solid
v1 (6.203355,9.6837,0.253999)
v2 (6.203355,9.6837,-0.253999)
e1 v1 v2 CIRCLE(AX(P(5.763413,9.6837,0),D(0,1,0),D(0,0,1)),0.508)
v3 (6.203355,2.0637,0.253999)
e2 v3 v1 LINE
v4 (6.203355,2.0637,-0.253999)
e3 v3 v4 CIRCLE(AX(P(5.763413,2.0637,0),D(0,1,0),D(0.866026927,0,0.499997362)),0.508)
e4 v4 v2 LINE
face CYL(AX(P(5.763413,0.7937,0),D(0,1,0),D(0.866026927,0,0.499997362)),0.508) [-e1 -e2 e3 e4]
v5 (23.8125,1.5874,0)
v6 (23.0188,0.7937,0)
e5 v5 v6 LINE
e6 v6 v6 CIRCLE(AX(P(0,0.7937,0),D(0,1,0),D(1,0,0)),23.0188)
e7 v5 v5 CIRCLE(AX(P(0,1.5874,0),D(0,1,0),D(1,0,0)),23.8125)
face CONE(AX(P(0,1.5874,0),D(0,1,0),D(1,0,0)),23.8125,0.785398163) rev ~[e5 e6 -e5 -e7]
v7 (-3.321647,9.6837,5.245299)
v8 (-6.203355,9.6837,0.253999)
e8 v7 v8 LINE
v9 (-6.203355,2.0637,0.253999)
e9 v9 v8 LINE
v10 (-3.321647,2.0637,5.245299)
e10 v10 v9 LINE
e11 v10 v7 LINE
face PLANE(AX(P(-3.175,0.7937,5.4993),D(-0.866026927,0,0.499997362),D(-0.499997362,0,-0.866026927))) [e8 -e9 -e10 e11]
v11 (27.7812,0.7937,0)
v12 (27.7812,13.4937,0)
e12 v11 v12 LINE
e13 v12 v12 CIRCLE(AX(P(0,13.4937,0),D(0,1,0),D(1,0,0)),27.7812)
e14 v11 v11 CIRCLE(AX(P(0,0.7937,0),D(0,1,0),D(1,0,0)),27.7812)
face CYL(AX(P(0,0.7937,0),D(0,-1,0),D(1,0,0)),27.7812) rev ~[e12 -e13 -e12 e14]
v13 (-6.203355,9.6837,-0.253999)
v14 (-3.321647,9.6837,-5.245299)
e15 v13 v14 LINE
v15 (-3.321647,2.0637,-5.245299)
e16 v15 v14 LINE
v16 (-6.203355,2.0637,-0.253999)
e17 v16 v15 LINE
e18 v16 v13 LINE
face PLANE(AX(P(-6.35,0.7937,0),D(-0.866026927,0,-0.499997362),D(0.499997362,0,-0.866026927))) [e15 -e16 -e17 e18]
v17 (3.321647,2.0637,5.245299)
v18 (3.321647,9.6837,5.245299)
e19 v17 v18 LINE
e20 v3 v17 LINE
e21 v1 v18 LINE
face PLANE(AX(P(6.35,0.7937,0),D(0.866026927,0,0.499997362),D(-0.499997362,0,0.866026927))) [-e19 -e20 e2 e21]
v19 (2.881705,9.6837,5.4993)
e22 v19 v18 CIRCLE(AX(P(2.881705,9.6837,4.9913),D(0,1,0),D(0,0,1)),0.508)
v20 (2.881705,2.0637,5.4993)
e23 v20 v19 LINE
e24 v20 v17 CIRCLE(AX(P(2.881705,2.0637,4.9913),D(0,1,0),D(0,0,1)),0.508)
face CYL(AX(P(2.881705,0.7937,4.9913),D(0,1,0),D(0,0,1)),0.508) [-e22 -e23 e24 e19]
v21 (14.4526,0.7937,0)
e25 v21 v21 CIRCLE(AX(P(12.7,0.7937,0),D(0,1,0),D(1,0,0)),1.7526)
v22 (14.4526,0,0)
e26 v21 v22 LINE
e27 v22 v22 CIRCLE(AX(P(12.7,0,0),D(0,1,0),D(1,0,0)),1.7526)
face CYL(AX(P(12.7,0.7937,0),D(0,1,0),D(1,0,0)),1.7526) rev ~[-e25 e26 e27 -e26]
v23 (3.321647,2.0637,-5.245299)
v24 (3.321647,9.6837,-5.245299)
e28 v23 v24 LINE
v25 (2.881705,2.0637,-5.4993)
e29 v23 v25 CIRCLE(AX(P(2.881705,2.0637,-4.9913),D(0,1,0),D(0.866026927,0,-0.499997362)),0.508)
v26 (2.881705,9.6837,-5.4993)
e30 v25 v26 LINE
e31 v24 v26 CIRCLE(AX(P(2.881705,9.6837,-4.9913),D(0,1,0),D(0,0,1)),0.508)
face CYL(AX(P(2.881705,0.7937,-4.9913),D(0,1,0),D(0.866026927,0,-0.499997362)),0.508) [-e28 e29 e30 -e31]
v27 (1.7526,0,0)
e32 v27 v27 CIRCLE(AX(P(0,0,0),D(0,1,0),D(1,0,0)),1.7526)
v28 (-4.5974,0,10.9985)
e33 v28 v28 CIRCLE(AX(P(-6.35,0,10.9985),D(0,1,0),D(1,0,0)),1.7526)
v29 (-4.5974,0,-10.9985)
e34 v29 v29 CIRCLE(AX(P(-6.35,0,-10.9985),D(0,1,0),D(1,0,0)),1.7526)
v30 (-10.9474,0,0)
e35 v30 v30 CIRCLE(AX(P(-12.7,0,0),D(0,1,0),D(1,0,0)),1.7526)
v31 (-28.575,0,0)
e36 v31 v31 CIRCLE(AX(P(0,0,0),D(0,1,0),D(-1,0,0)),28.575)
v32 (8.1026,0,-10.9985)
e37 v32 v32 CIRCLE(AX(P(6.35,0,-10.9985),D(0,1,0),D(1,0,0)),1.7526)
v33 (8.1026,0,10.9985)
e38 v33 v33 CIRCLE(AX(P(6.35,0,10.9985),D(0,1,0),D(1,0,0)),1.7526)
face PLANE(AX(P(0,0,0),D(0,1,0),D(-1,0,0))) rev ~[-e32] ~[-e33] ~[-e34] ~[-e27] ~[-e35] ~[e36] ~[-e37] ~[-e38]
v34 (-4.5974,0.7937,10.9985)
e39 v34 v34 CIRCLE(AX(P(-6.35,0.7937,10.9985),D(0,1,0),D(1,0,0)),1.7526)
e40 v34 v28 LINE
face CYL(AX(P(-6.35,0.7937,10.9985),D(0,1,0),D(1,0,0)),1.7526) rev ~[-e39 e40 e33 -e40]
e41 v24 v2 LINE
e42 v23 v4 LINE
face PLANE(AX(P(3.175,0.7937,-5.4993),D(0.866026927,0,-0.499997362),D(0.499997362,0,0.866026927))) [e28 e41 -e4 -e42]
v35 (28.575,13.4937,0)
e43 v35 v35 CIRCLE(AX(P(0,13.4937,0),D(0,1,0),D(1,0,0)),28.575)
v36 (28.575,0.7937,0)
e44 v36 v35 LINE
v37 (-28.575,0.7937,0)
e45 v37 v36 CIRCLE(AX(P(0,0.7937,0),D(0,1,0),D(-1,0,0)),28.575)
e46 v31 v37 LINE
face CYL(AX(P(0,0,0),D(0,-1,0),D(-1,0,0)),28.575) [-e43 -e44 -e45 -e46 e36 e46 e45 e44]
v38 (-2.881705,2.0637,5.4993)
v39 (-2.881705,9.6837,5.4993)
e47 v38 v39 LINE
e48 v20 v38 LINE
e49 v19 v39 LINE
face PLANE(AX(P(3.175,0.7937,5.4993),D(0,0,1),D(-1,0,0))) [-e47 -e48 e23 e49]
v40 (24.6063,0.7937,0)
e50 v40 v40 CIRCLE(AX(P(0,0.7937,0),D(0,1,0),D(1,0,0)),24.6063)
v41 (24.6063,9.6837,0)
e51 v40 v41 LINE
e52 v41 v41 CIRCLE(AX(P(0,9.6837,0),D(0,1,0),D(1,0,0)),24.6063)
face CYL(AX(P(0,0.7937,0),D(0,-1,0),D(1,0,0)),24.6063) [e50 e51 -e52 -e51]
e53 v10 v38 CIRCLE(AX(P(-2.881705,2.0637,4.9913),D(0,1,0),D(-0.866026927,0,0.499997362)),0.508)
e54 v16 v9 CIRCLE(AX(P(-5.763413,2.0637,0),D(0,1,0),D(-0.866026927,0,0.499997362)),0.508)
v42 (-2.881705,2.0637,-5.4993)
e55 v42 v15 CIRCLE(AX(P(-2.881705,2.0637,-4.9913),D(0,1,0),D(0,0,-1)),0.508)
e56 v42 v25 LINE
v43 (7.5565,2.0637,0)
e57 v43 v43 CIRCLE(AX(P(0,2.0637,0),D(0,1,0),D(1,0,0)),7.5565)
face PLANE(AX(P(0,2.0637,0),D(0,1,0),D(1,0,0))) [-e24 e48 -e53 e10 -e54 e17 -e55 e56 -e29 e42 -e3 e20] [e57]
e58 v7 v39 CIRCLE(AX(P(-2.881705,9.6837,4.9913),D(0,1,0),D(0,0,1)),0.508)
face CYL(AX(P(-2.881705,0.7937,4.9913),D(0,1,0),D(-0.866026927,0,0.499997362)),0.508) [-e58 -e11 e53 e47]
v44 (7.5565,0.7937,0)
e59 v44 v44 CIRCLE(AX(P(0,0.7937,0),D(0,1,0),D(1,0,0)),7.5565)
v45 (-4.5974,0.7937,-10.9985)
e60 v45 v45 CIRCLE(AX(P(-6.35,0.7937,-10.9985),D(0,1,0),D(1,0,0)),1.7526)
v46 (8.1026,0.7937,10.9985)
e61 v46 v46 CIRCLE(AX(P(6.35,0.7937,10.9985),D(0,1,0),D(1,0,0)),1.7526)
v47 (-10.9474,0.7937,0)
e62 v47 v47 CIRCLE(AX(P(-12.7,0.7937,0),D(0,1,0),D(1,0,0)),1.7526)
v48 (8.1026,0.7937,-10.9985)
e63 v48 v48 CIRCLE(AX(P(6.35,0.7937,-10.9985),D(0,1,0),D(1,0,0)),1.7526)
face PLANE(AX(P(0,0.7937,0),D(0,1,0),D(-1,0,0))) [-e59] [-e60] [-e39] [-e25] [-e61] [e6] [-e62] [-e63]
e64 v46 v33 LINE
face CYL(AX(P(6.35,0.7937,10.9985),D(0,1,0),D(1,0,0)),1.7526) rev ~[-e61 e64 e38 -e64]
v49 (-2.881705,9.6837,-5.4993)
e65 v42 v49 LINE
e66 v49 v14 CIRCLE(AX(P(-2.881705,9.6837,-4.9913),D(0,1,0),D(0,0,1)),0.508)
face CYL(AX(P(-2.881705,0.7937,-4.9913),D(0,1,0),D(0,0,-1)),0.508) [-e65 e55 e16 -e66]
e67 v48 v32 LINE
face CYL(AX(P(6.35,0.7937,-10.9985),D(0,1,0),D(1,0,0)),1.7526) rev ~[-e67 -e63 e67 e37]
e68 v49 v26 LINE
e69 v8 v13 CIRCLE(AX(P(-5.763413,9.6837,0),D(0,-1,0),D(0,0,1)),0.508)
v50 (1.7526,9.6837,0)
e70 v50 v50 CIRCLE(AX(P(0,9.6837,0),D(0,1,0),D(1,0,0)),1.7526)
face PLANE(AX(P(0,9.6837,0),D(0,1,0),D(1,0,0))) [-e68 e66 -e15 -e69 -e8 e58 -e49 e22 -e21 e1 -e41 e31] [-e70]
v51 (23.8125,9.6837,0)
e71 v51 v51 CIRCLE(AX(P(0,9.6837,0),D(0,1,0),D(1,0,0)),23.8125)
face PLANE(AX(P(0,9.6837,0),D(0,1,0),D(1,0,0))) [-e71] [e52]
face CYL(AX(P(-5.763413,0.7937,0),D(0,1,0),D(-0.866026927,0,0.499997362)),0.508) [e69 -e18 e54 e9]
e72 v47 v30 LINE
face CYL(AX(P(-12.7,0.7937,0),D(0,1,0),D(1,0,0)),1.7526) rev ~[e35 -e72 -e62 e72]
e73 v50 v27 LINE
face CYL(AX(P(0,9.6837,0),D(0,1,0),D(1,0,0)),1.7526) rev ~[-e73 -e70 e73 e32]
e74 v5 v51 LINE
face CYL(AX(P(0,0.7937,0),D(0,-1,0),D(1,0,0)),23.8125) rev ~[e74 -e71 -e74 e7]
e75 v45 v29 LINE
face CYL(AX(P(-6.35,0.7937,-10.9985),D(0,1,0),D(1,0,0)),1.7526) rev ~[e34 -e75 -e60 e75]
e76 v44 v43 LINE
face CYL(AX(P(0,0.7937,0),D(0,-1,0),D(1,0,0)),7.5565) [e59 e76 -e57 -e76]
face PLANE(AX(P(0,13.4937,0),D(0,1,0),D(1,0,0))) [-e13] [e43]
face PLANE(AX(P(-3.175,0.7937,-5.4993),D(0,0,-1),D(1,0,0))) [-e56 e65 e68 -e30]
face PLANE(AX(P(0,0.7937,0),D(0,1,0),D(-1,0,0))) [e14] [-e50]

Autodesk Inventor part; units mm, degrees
ref_plane "YZ Plane" through (0, 0, 0) normal (1, 0, 0) x (0, 1, 0)
ref_plane "XZ Plane" through (0, 0, 0) normal (0, 1, 0) x (-1, 0, 0)
ref_plane "XY Plane" through (0, 0, 0) normal (0, 0, 1) x (1, 0, 0)
sketch "Sketch1" plane through (0, 0, 0) normal (0, 1, 0) x (-1, 0, 0)
  circle A0 centre (0, 0) radius 28.575
  dimension "d0" = 57.15
extrude "Extrusion1" add sketch "Sketch1" along normal blind 0.7937
sketch "Sketch2" plane through (0, 0.7937, 0) normal (0, 1, 0) x (1, 0, 0)
  line L0 (0, 0) -> (-28.575, 0) construction
  circle A0 centre (0, 0) radius 28.575 projected
  line L1 (-6.35, 0) -> (-3.175, 5.4993)
  line L2 (-3.175, 5.4993) -> (3.175, 5.4993)
  line L3 (3.175, 5.4993) -> (6.35, 0)
  line L4 (6.35, 0) -> (3.175, -5.4993)
  line L5 (3.175, -5.4993) -> (-3.175, -5.4993)
  line L6 (-3.175, -5.4993) -> (-6.35, 0)
  circle A1 centre (0, 0) radius 23.8125
  circle A2 centre (0, 0) radius 24.6063
  circle A3 centre (0, 0) radius 27.7812
  circle A4 centre (0, 0) radius 7.5565
  circle A5 centre (0, 0) radius 12.7 construction
  circle A6 centre (-12.7, 0) radius 1.7526
  circle A7 centre (-6.35, -10.9985) radius 1.7526
  circle A8 centre (6.35, -10.9985) radius 1.7526
  circle A9 centre (12.7, 0) radius 1.7526
  circle A10 centre (6.35, 10.9985) radius 1.7526
  circle A11 centre (-6.35, 10.9985) radius 1.7526
  dimension "d18" = 25.4
  dimension "d3" = 6.35
  dimension "d4" = 47.625
  dimension "d5" = 0.7937
  dimension "d6" = 0.7937
  dimension "d15" = 15.113
  dimension "d19" = 3.5052
  dimension "d22" = 360
extrude "Extrusion2" add sketch "Sketch2" along normal blind 8.89 contours L1 L2 L3 L4 L5 L6 | A2
fillet "Fillet1" radius 0.508 6 edges at (6.35, 5.2387, 0) (3.175, 5.2387, -5.4993) (-3.175, 5.2387, -5.4993) (-6.35, 5.2387, 0) (-3.175, 5.2387, 5.4993) (3.175, 5.2387, 5.4993)
extrude "Extrusion3" add sketch "Sketch2" along normal blind 12.7 contours A0
chamfer "Chamfer1" distance 0.7937 angle 45 1 edges at (-23.8125, 0.7937, 0)
extrude "Extrusion4" add sketch "Sketch2" along normal blind 1.27 contours L1 L2 L3 L4 L5 L6 | A4
extrude "Extrusion5" cut sketch "Sketch2" against normal through all contours A6 | A7 | A8 | A9 | A10 | A11
sketch "Sketch3" plane through (0, 9.6837, 0) normal (0, 1, 0) x (1, 0, 0)
  circle A0 centre (0, 0) radius 1.7526
  dimension "d26" = 3.5052
extrude "Extrusion6" cut sketch "Sketch3" against normal through all
properties part number "Wheel V2 Mold"
